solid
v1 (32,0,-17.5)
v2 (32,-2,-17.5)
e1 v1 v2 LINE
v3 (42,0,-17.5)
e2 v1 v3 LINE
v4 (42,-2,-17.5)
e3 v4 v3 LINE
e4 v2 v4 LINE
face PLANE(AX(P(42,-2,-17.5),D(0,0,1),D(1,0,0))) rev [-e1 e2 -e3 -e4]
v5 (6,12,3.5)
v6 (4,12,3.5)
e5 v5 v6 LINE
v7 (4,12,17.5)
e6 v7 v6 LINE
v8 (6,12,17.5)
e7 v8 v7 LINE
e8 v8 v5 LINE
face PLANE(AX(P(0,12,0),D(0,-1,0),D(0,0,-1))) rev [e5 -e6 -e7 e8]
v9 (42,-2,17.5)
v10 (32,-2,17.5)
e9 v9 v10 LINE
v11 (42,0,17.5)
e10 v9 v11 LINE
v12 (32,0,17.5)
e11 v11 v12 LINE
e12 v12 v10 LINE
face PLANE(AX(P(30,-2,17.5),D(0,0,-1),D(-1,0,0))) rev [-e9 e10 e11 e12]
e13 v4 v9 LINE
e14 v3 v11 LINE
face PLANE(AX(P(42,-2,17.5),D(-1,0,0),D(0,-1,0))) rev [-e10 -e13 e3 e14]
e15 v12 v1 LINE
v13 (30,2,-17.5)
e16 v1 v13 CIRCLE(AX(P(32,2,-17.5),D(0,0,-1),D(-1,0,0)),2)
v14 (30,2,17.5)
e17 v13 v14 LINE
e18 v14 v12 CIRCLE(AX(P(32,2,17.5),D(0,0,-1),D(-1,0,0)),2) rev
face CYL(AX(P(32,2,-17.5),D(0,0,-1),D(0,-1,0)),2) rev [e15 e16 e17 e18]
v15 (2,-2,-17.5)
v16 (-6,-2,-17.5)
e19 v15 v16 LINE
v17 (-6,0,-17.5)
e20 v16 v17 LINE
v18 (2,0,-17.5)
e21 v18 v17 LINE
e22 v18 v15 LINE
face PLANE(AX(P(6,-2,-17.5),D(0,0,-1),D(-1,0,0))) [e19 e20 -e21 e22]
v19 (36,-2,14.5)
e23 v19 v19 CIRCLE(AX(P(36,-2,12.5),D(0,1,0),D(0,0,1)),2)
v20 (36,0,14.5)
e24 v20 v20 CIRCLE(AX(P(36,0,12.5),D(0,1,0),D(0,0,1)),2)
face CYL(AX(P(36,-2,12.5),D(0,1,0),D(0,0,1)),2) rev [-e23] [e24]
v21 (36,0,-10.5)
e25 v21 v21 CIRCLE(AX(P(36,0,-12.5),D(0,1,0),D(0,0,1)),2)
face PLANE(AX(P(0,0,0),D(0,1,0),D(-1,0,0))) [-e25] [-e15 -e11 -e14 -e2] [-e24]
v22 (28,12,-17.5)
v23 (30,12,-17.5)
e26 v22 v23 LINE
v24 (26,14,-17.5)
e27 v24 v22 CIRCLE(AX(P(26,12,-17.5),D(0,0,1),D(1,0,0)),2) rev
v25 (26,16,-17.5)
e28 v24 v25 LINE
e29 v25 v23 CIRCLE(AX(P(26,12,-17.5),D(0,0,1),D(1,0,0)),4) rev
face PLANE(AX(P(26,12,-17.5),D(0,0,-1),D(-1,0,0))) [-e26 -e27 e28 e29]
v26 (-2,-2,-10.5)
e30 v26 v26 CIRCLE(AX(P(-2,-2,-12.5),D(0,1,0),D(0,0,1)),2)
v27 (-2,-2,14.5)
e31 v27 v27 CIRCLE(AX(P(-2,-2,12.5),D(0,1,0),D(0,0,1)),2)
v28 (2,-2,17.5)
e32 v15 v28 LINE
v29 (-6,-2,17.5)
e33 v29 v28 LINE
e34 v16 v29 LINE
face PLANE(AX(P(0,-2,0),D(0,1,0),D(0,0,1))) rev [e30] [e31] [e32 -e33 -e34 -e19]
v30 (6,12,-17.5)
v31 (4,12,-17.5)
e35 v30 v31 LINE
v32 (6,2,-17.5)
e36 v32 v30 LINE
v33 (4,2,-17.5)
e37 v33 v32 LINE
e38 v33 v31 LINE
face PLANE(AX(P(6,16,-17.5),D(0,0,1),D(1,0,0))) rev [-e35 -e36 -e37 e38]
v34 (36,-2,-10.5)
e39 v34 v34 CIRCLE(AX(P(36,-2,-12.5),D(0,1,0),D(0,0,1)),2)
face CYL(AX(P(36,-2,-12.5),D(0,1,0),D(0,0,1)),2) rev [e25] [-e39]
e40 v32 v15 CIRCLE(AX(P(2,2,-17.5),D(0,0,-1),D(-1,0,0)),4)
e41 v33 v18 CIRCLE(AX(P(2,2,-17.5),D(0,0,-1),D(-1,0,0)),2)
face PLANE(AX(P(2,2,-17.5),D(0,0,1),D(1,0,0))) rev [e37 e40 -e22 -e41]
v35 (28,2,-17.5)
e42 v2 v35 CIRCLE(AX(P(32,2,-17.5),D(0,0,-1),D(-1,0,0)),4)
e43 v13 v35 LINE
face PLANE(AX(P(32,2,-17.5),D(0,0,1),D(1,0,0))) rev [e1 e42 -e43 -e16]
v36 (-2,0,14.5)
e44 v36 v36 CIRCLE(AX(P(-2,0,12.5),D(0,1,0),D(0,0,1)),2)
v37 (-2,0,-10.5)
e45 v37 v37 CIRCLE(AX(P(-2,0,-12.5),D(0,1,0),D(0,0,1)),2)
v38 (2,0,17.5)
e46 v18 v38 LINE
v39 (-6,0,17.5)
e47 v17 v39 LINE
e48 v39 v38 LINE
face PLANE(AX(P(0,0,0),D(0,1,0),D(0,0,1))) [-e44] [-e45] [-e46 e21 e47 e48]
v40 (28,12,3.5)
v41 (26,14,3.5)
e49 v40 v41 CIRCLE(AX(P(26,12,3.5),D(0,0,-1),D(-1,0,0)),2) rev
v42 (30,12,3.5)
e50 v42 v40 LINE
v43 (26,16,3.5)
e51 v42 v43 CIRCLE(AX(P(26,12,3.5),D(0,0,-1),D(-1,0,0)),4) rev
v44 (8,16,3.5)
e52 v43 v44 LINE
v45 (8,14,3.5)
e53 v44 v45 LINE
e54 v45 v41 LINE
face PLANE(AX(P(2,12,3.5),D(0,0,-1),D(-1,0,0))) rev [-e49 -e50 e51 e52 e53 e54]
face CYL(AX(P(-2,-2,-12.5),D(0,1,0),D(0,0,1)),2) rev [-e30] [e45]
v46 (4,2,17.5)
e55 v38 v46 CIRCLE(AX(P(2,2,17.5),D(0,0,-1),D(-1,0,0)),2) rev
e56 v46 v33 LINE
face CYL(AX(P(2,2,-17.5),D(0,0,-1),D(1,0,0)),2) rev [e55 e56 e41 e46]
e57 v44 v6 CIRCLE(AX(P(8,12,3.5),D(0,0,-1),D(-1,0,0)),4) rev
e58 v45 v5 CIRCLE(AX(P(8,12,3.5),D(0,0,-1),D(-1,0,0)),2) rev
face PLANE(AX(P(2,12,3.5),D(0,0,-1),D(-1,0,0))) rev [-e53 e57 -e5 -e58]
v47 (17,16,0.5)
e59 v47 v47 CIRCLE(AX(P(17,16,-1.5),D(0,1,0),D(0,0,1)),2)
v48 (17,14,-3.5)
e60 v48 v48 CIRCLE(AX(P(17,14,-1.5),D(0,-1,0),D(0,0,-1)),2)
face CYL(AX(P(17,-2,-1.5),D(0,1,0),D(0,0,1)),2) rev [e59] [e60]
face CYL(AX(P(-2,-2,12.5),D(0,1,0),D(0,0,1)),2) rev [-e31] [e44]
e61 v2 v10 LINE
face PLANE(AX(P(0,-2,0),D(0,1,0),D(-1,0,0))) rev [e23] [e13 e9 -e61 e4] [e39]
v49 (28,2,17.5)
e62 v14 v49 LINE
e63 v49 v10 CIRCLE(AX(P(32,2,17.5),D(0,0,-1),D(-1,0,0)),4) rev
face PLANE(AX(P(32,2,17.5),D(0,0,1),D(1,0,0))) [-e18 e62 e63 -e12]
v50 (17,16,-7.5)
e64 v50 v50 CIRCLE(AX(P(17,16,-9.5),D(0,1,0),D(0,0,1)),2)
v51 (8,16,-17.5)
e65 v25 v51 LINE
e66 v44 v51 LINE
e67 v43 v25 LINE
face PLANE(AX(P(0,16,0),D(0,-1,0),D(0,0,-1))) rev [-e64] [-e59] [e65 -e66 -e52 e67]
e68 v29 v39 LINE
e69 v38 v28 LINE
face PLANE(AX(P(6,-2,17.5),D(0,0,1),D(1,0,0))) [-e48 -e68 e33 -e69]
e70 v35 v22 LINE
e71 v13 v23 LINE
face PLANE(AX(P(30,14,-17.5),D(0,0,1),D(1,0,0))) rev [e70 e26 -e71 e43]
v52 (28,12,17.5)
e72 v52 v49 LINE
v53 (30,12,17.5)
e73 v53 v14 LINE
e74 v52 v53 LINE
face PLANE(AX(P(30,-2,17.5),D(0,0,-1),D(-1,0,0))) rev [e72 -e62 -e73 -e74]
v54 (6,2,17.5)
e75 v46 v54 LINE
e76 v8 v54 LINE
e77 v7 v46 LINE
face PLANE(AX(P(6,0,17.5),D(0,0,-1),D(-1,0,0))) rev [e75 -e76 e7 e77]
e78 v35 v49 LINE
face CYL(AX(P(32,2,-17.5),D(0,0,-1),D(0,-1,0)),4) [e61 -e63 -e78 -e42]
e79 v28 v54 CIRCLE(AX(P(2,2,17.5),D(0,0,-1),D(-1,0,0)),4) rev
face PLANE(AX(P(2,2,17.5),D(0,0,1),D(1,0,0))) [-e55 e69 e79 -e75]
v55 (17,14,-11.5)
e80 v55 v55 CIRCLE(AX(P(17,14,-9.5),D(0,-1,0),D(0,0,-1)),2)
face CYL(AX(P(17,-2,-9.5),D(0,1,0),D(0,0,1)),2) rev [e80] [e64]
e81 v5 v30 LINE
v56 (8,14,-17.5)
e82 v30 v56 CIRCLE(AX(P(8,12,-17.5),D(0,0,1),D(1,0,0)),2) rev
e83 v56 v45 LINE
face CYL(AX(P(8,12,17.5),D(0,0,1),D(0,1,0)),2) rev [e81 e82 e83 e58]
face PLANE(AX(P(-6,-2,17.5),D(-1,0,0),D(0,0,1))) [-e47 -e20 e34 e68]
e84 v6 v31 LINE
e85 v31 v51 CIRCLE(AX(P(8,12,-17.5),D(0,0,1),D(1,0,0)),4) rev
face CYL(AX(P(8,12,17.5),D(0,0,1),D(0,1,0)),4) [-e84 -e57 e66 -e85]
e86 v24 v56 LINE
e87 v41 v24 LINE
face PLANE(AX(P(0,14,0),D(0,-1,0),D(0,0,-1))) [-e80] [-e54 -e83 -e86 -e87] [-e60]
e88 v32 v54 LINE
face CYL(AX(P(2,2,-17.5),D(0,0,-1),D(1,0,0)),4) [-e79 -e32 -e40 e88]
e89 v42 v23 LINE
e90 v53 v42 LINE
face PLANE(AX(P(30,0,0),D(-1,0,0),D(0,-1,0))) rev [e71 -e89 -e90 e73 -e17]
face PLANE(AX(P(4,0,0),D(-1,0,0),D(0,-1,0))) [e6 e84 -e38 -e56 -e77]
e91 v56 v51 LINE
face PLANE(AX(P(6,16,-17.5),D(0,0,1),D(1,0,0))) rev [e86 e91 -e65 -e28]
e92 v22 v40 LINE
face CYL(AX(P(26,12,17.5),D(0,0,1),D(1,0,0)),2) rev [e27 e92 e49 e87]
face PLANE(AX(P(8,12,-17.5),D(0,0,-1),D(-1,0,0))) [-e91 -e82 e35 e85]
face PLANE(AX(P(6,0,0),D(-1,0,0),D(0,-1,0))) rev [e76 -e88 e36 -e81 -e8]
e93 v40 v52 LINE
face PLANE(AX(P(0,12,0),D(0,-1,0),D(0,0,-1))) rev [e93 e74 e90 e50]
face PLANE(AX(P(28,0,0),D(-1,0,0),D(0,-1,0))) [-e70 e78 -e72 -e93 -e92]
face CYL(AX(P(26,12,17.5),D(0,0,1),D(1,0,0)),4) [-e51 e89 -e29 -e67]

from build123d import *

# Parameters (mm, degrees)
SKETCH1_W                    = 12
SKETCH1_H                    = 35
BASE_FLANGE1_DEPTH           = 2
EDGE_FLANGE1_STRIP_W         = 12
EDGE_FLANGE1_STRIP_H         = 2
EDGE_FLANGE1_STRIP_CUT_DEPTH = 35
EDGE_FLANGE1_DEPTH           = 35
EDGE_FLANGE2_STRIP_W         = 12
EDGE_FLANGE2_STRIP_H         = 2
EDGE_FLANGE2_STRIP_CUT_DEPTH = 35
EDGE_FLANGE2_DEPTH           = 35
EDGE_FLANGE3_STRIP_W         = 12
EDGE_FLANGE3_STRIP_H         = 2
EDGE_FLANGE3_STRIP_CUT_DEPTH = 35
EDGE_FLANGE3_DEPTH           = 35
EDGE_FLANGE4_STRIP_W         = 12
EDGE_FLANGE4_STRIP_H         = 2
EDGE_FLANGE4_STRIP_CUT_DEPTH = 35
EDGE_FLANGE4_DEPTH           = 35
SKETCH18_W                   = 30
SKETCH18_H                   = 14
CUT_EXTRUDE1_DEPTH           = 4
SKETCH19_R                   = 2
CUT_EXTRUDE2_DEPTH           = 49.231213959
SKETCH20_R                   = 2
CUT_EXTRUDE4_DEPTH           = 49.931073971


# Sheet-metal steps are written as plain solids
with BuildPart() as part:
    # Sketch1 → Base-Flange1 (new body)
    with BuildSketch(Plane(origin=(0, 0, 0), x_dir=(1, 0, 0), z_dir=(0, 1, 0))):
        Rectangle(SKETCH1_W, SKETCH1_H)
    extrude(amount=-BASE_FLANGE1_DEPTH)

    # Edge-Flange1 strip (across the edge) → Edge-Flange1 strip cut (cut)
    with BuildSketch(Plane(origin=(6, 0, 17.5), x_dir=(-1, 0, 0), z_dir=(0, 0, -1))):
        with Locations((-2, -1)):
            Rectangle(EDGE_FLANGE1_STRIP_W, EDGE_FLANGE1_STRIP_H)
    extrude(amount=EDGE_FLANGE1_STRIP_CUT_DEPTH, mode=Mode.SUBTRACT)

    # Edge-Flange1 section (across the edge) → Edge-Flange1 (add)
    with BuildSketch(Plane(origin=(6, 0, 17.5), x_dir=(-1, 0, 0), z_dir=(0, 0, -1))):
        with BuildLine():
            Line((0, 2), (0, 16))
            Line((0, 16), (2, 16))
            Line((2, 16), (2, 2))
            ThreePointArc((2, 2), (2.585786438, 0.585786438), (4, 0))
            Line((4, 0), (4, -2))
            ThreePointArc((4, -2), (1.171572875, -0.828427125), (0, 2))
        make_face()
    extrude(amount=EDGE_FLANGE1_DEPTH)

    # Edge-Flange2 strip (across the edge) → Edge-Flange2 strip cut (cut)
    with BuildSketch(Plane(origin=(6, 16, -17.5), x_dir=(0, -1, 0), z_dir=(0, 0, 1))):
        with Locations((-2, -1)):
            Rectangle(EDGE_FLANGE2_STRIP_W, EDGE_FLANGE2_STRIP_H)
    extrude(amount=EDGE_FLANGE2_STRIP_CUT_DEPTH, mode=Mode.SUBTRACT)

    # Edge-Flange2 section (across the edge) → Edge-Flange2 (add)
    with BuildSketch(Plane(origin=(6, 16, -17.5), x_dir=(0, -1, 0), z_dir=(0, 0, 1))):
        with BuildLine():
            Line((0, 2), (0, 24))
            Line((0, 24), (2, 24))
            Line((2, 24), (2, 2))
            ThreePointArc((2, 2), (2.585786438, 0.585786438), (4, 0))
            Line((4, 0), (4, -2))
            ThreePointArc((4, -2), (1.171572875, -0.828427125), (0, 2))
        make_face()
    extrude(amount=EDGE_FLANGE2_DEPTH)

    # Edge-Flange3 strip (across the edge) → Edge-Flange3 strip cut (cut)
    with BuildSketch(Plane(origin=(30, 14, -17.5), x_dir=(-1, 0, 0), z_dir=(0, 0, 1))):
        with Locations((-2, -1)):
            Rectangle(EDGE_FLANGE3_STRIP_W, EDGE_FLANGE3_STRIP_H)
    extrude(amount=EDGE_FLANGE3_STRIP_CUT_DEPTH, mode=Mode.SUBTRACT)

    # Edge-Flange3 section (across the edge) → Edge-Flange3 (add)
    with BuildSketch(Plane(origin=(30, 14, -17.5), x_dir=(-1, 0, 0), z_dir=(0, 0, 1))):
        with BuildLine():
            Line((0, 2), (0, 16))
            Line((0, 16), (2, 16))
            Line((2, 16), (2, 2))
            ThreePointArc((2, 2), (2.585786438, 0.585786438), (4, 0))
            Line((4, 0), (4, -2))
            ThreePointArc((4, -2), (1.171572875, -0.828427125), (0, 2))
        make_face()
    extrude(amount=EDGE_FLANGE3_DEPTH)

    # Edge-Flange4 strip (across the edge) → Edge-Flange4 strip cut (cut)
    with BuildSketch(Plane(origin=(30, -2, 17.5), x_dir=(0, 1, 0), z_dir=(0, 0, -1))):
        with Locations((-2, -1)):
            Rectangle(EDGE_FLANGE4_STRIP_W, EDGE_FLANGE4_STRIP_H)
    extrude(amount=EDGE_FLANGE4_STRIP_CUT_DEPTH, mode=Mode.SUBTRACT)

    # Edge-Flange4 section (across the edge) → Edge-Flange4 (add)
    with BuildSketch(Plane(origin=(30, -2, 17.5), x_dir=(0, 1, 0), z_dir=(0, 0, -1))):
        with BuildLine():
            Line((0, 2), (0, 12))
            Line((0, 12), (2, 12))
            Line((2, 12), (2, 2))
            ThreePointArc((2, 2), (2.585786438, 0.585786438), (4, 0))
            Line((4, 0), (4, -2))
            ThreePointArc((4, -2), (1.171572875, -0.828427125), (0, 2))
        make_face()
    extrude(amount=EDGE_FLANGE4_DEPTH)

    # Sketch18 → Cut-Extrude1 (cut)
    with BuildSketch(Plane(origin=(0, 16, 0), x_dir=(1, 0, 0), z_dir=(0, 1, 0))):
        with Locations((17, -10.5)):
            Rectangle(SKETCH18_W, SKETCH18_H)
    extrude(amount=-CUT_EXTRUDE1_DEPTH, mode=Mode.SUBTRACT)

    # Sketch19 → Cut-Extrude2 (cut, through all)
    with BuildSketch(Plane(origin=(0, 0, 0), x_dir=(1, 0, 0), z_dir=(0, 1, 0))):
        with Locations(Location((-2, 12.5, 0), (0, 0, 270))):
            Circle(SKETCH19_R)
        with Locations(Location((-2, -12.5, 0), (0, 0, 270))):
            Circle(SKETCH19_R)
        with Locations(Location((36, 12.5, 0), (0, 0, 270))):
            Circle(SKETCH19_R)
        with Locations(Location((36, -12.5, 0), (0, 0, 270))):
            Circle(SKETCH19_R)
    extrude(amount=-CUT_EXTRUDE2_DEPTH, mode=Mode.SUBTRACT)

    # Sketch20 → Cut-Extrude4 (cut, through all)
    with BuildSketch(Plane(origin=(0, 16, 0), x_dir=(1, 0, 0), z_dir=(0, 1, 0))):
        with Locations(Location((17, 9.5, 0), (0, 0, 270))):
            Circle(SKETCH20_R)
        with Locations(Location((17, 1.5, 0), (0, 0, 270))):
            Circle(SKETCH20_R)
    extrude(amount=-CUT_EXTRUDE4_DEPTH, mode=Mode.SUBTRACT)


solid = part.part
